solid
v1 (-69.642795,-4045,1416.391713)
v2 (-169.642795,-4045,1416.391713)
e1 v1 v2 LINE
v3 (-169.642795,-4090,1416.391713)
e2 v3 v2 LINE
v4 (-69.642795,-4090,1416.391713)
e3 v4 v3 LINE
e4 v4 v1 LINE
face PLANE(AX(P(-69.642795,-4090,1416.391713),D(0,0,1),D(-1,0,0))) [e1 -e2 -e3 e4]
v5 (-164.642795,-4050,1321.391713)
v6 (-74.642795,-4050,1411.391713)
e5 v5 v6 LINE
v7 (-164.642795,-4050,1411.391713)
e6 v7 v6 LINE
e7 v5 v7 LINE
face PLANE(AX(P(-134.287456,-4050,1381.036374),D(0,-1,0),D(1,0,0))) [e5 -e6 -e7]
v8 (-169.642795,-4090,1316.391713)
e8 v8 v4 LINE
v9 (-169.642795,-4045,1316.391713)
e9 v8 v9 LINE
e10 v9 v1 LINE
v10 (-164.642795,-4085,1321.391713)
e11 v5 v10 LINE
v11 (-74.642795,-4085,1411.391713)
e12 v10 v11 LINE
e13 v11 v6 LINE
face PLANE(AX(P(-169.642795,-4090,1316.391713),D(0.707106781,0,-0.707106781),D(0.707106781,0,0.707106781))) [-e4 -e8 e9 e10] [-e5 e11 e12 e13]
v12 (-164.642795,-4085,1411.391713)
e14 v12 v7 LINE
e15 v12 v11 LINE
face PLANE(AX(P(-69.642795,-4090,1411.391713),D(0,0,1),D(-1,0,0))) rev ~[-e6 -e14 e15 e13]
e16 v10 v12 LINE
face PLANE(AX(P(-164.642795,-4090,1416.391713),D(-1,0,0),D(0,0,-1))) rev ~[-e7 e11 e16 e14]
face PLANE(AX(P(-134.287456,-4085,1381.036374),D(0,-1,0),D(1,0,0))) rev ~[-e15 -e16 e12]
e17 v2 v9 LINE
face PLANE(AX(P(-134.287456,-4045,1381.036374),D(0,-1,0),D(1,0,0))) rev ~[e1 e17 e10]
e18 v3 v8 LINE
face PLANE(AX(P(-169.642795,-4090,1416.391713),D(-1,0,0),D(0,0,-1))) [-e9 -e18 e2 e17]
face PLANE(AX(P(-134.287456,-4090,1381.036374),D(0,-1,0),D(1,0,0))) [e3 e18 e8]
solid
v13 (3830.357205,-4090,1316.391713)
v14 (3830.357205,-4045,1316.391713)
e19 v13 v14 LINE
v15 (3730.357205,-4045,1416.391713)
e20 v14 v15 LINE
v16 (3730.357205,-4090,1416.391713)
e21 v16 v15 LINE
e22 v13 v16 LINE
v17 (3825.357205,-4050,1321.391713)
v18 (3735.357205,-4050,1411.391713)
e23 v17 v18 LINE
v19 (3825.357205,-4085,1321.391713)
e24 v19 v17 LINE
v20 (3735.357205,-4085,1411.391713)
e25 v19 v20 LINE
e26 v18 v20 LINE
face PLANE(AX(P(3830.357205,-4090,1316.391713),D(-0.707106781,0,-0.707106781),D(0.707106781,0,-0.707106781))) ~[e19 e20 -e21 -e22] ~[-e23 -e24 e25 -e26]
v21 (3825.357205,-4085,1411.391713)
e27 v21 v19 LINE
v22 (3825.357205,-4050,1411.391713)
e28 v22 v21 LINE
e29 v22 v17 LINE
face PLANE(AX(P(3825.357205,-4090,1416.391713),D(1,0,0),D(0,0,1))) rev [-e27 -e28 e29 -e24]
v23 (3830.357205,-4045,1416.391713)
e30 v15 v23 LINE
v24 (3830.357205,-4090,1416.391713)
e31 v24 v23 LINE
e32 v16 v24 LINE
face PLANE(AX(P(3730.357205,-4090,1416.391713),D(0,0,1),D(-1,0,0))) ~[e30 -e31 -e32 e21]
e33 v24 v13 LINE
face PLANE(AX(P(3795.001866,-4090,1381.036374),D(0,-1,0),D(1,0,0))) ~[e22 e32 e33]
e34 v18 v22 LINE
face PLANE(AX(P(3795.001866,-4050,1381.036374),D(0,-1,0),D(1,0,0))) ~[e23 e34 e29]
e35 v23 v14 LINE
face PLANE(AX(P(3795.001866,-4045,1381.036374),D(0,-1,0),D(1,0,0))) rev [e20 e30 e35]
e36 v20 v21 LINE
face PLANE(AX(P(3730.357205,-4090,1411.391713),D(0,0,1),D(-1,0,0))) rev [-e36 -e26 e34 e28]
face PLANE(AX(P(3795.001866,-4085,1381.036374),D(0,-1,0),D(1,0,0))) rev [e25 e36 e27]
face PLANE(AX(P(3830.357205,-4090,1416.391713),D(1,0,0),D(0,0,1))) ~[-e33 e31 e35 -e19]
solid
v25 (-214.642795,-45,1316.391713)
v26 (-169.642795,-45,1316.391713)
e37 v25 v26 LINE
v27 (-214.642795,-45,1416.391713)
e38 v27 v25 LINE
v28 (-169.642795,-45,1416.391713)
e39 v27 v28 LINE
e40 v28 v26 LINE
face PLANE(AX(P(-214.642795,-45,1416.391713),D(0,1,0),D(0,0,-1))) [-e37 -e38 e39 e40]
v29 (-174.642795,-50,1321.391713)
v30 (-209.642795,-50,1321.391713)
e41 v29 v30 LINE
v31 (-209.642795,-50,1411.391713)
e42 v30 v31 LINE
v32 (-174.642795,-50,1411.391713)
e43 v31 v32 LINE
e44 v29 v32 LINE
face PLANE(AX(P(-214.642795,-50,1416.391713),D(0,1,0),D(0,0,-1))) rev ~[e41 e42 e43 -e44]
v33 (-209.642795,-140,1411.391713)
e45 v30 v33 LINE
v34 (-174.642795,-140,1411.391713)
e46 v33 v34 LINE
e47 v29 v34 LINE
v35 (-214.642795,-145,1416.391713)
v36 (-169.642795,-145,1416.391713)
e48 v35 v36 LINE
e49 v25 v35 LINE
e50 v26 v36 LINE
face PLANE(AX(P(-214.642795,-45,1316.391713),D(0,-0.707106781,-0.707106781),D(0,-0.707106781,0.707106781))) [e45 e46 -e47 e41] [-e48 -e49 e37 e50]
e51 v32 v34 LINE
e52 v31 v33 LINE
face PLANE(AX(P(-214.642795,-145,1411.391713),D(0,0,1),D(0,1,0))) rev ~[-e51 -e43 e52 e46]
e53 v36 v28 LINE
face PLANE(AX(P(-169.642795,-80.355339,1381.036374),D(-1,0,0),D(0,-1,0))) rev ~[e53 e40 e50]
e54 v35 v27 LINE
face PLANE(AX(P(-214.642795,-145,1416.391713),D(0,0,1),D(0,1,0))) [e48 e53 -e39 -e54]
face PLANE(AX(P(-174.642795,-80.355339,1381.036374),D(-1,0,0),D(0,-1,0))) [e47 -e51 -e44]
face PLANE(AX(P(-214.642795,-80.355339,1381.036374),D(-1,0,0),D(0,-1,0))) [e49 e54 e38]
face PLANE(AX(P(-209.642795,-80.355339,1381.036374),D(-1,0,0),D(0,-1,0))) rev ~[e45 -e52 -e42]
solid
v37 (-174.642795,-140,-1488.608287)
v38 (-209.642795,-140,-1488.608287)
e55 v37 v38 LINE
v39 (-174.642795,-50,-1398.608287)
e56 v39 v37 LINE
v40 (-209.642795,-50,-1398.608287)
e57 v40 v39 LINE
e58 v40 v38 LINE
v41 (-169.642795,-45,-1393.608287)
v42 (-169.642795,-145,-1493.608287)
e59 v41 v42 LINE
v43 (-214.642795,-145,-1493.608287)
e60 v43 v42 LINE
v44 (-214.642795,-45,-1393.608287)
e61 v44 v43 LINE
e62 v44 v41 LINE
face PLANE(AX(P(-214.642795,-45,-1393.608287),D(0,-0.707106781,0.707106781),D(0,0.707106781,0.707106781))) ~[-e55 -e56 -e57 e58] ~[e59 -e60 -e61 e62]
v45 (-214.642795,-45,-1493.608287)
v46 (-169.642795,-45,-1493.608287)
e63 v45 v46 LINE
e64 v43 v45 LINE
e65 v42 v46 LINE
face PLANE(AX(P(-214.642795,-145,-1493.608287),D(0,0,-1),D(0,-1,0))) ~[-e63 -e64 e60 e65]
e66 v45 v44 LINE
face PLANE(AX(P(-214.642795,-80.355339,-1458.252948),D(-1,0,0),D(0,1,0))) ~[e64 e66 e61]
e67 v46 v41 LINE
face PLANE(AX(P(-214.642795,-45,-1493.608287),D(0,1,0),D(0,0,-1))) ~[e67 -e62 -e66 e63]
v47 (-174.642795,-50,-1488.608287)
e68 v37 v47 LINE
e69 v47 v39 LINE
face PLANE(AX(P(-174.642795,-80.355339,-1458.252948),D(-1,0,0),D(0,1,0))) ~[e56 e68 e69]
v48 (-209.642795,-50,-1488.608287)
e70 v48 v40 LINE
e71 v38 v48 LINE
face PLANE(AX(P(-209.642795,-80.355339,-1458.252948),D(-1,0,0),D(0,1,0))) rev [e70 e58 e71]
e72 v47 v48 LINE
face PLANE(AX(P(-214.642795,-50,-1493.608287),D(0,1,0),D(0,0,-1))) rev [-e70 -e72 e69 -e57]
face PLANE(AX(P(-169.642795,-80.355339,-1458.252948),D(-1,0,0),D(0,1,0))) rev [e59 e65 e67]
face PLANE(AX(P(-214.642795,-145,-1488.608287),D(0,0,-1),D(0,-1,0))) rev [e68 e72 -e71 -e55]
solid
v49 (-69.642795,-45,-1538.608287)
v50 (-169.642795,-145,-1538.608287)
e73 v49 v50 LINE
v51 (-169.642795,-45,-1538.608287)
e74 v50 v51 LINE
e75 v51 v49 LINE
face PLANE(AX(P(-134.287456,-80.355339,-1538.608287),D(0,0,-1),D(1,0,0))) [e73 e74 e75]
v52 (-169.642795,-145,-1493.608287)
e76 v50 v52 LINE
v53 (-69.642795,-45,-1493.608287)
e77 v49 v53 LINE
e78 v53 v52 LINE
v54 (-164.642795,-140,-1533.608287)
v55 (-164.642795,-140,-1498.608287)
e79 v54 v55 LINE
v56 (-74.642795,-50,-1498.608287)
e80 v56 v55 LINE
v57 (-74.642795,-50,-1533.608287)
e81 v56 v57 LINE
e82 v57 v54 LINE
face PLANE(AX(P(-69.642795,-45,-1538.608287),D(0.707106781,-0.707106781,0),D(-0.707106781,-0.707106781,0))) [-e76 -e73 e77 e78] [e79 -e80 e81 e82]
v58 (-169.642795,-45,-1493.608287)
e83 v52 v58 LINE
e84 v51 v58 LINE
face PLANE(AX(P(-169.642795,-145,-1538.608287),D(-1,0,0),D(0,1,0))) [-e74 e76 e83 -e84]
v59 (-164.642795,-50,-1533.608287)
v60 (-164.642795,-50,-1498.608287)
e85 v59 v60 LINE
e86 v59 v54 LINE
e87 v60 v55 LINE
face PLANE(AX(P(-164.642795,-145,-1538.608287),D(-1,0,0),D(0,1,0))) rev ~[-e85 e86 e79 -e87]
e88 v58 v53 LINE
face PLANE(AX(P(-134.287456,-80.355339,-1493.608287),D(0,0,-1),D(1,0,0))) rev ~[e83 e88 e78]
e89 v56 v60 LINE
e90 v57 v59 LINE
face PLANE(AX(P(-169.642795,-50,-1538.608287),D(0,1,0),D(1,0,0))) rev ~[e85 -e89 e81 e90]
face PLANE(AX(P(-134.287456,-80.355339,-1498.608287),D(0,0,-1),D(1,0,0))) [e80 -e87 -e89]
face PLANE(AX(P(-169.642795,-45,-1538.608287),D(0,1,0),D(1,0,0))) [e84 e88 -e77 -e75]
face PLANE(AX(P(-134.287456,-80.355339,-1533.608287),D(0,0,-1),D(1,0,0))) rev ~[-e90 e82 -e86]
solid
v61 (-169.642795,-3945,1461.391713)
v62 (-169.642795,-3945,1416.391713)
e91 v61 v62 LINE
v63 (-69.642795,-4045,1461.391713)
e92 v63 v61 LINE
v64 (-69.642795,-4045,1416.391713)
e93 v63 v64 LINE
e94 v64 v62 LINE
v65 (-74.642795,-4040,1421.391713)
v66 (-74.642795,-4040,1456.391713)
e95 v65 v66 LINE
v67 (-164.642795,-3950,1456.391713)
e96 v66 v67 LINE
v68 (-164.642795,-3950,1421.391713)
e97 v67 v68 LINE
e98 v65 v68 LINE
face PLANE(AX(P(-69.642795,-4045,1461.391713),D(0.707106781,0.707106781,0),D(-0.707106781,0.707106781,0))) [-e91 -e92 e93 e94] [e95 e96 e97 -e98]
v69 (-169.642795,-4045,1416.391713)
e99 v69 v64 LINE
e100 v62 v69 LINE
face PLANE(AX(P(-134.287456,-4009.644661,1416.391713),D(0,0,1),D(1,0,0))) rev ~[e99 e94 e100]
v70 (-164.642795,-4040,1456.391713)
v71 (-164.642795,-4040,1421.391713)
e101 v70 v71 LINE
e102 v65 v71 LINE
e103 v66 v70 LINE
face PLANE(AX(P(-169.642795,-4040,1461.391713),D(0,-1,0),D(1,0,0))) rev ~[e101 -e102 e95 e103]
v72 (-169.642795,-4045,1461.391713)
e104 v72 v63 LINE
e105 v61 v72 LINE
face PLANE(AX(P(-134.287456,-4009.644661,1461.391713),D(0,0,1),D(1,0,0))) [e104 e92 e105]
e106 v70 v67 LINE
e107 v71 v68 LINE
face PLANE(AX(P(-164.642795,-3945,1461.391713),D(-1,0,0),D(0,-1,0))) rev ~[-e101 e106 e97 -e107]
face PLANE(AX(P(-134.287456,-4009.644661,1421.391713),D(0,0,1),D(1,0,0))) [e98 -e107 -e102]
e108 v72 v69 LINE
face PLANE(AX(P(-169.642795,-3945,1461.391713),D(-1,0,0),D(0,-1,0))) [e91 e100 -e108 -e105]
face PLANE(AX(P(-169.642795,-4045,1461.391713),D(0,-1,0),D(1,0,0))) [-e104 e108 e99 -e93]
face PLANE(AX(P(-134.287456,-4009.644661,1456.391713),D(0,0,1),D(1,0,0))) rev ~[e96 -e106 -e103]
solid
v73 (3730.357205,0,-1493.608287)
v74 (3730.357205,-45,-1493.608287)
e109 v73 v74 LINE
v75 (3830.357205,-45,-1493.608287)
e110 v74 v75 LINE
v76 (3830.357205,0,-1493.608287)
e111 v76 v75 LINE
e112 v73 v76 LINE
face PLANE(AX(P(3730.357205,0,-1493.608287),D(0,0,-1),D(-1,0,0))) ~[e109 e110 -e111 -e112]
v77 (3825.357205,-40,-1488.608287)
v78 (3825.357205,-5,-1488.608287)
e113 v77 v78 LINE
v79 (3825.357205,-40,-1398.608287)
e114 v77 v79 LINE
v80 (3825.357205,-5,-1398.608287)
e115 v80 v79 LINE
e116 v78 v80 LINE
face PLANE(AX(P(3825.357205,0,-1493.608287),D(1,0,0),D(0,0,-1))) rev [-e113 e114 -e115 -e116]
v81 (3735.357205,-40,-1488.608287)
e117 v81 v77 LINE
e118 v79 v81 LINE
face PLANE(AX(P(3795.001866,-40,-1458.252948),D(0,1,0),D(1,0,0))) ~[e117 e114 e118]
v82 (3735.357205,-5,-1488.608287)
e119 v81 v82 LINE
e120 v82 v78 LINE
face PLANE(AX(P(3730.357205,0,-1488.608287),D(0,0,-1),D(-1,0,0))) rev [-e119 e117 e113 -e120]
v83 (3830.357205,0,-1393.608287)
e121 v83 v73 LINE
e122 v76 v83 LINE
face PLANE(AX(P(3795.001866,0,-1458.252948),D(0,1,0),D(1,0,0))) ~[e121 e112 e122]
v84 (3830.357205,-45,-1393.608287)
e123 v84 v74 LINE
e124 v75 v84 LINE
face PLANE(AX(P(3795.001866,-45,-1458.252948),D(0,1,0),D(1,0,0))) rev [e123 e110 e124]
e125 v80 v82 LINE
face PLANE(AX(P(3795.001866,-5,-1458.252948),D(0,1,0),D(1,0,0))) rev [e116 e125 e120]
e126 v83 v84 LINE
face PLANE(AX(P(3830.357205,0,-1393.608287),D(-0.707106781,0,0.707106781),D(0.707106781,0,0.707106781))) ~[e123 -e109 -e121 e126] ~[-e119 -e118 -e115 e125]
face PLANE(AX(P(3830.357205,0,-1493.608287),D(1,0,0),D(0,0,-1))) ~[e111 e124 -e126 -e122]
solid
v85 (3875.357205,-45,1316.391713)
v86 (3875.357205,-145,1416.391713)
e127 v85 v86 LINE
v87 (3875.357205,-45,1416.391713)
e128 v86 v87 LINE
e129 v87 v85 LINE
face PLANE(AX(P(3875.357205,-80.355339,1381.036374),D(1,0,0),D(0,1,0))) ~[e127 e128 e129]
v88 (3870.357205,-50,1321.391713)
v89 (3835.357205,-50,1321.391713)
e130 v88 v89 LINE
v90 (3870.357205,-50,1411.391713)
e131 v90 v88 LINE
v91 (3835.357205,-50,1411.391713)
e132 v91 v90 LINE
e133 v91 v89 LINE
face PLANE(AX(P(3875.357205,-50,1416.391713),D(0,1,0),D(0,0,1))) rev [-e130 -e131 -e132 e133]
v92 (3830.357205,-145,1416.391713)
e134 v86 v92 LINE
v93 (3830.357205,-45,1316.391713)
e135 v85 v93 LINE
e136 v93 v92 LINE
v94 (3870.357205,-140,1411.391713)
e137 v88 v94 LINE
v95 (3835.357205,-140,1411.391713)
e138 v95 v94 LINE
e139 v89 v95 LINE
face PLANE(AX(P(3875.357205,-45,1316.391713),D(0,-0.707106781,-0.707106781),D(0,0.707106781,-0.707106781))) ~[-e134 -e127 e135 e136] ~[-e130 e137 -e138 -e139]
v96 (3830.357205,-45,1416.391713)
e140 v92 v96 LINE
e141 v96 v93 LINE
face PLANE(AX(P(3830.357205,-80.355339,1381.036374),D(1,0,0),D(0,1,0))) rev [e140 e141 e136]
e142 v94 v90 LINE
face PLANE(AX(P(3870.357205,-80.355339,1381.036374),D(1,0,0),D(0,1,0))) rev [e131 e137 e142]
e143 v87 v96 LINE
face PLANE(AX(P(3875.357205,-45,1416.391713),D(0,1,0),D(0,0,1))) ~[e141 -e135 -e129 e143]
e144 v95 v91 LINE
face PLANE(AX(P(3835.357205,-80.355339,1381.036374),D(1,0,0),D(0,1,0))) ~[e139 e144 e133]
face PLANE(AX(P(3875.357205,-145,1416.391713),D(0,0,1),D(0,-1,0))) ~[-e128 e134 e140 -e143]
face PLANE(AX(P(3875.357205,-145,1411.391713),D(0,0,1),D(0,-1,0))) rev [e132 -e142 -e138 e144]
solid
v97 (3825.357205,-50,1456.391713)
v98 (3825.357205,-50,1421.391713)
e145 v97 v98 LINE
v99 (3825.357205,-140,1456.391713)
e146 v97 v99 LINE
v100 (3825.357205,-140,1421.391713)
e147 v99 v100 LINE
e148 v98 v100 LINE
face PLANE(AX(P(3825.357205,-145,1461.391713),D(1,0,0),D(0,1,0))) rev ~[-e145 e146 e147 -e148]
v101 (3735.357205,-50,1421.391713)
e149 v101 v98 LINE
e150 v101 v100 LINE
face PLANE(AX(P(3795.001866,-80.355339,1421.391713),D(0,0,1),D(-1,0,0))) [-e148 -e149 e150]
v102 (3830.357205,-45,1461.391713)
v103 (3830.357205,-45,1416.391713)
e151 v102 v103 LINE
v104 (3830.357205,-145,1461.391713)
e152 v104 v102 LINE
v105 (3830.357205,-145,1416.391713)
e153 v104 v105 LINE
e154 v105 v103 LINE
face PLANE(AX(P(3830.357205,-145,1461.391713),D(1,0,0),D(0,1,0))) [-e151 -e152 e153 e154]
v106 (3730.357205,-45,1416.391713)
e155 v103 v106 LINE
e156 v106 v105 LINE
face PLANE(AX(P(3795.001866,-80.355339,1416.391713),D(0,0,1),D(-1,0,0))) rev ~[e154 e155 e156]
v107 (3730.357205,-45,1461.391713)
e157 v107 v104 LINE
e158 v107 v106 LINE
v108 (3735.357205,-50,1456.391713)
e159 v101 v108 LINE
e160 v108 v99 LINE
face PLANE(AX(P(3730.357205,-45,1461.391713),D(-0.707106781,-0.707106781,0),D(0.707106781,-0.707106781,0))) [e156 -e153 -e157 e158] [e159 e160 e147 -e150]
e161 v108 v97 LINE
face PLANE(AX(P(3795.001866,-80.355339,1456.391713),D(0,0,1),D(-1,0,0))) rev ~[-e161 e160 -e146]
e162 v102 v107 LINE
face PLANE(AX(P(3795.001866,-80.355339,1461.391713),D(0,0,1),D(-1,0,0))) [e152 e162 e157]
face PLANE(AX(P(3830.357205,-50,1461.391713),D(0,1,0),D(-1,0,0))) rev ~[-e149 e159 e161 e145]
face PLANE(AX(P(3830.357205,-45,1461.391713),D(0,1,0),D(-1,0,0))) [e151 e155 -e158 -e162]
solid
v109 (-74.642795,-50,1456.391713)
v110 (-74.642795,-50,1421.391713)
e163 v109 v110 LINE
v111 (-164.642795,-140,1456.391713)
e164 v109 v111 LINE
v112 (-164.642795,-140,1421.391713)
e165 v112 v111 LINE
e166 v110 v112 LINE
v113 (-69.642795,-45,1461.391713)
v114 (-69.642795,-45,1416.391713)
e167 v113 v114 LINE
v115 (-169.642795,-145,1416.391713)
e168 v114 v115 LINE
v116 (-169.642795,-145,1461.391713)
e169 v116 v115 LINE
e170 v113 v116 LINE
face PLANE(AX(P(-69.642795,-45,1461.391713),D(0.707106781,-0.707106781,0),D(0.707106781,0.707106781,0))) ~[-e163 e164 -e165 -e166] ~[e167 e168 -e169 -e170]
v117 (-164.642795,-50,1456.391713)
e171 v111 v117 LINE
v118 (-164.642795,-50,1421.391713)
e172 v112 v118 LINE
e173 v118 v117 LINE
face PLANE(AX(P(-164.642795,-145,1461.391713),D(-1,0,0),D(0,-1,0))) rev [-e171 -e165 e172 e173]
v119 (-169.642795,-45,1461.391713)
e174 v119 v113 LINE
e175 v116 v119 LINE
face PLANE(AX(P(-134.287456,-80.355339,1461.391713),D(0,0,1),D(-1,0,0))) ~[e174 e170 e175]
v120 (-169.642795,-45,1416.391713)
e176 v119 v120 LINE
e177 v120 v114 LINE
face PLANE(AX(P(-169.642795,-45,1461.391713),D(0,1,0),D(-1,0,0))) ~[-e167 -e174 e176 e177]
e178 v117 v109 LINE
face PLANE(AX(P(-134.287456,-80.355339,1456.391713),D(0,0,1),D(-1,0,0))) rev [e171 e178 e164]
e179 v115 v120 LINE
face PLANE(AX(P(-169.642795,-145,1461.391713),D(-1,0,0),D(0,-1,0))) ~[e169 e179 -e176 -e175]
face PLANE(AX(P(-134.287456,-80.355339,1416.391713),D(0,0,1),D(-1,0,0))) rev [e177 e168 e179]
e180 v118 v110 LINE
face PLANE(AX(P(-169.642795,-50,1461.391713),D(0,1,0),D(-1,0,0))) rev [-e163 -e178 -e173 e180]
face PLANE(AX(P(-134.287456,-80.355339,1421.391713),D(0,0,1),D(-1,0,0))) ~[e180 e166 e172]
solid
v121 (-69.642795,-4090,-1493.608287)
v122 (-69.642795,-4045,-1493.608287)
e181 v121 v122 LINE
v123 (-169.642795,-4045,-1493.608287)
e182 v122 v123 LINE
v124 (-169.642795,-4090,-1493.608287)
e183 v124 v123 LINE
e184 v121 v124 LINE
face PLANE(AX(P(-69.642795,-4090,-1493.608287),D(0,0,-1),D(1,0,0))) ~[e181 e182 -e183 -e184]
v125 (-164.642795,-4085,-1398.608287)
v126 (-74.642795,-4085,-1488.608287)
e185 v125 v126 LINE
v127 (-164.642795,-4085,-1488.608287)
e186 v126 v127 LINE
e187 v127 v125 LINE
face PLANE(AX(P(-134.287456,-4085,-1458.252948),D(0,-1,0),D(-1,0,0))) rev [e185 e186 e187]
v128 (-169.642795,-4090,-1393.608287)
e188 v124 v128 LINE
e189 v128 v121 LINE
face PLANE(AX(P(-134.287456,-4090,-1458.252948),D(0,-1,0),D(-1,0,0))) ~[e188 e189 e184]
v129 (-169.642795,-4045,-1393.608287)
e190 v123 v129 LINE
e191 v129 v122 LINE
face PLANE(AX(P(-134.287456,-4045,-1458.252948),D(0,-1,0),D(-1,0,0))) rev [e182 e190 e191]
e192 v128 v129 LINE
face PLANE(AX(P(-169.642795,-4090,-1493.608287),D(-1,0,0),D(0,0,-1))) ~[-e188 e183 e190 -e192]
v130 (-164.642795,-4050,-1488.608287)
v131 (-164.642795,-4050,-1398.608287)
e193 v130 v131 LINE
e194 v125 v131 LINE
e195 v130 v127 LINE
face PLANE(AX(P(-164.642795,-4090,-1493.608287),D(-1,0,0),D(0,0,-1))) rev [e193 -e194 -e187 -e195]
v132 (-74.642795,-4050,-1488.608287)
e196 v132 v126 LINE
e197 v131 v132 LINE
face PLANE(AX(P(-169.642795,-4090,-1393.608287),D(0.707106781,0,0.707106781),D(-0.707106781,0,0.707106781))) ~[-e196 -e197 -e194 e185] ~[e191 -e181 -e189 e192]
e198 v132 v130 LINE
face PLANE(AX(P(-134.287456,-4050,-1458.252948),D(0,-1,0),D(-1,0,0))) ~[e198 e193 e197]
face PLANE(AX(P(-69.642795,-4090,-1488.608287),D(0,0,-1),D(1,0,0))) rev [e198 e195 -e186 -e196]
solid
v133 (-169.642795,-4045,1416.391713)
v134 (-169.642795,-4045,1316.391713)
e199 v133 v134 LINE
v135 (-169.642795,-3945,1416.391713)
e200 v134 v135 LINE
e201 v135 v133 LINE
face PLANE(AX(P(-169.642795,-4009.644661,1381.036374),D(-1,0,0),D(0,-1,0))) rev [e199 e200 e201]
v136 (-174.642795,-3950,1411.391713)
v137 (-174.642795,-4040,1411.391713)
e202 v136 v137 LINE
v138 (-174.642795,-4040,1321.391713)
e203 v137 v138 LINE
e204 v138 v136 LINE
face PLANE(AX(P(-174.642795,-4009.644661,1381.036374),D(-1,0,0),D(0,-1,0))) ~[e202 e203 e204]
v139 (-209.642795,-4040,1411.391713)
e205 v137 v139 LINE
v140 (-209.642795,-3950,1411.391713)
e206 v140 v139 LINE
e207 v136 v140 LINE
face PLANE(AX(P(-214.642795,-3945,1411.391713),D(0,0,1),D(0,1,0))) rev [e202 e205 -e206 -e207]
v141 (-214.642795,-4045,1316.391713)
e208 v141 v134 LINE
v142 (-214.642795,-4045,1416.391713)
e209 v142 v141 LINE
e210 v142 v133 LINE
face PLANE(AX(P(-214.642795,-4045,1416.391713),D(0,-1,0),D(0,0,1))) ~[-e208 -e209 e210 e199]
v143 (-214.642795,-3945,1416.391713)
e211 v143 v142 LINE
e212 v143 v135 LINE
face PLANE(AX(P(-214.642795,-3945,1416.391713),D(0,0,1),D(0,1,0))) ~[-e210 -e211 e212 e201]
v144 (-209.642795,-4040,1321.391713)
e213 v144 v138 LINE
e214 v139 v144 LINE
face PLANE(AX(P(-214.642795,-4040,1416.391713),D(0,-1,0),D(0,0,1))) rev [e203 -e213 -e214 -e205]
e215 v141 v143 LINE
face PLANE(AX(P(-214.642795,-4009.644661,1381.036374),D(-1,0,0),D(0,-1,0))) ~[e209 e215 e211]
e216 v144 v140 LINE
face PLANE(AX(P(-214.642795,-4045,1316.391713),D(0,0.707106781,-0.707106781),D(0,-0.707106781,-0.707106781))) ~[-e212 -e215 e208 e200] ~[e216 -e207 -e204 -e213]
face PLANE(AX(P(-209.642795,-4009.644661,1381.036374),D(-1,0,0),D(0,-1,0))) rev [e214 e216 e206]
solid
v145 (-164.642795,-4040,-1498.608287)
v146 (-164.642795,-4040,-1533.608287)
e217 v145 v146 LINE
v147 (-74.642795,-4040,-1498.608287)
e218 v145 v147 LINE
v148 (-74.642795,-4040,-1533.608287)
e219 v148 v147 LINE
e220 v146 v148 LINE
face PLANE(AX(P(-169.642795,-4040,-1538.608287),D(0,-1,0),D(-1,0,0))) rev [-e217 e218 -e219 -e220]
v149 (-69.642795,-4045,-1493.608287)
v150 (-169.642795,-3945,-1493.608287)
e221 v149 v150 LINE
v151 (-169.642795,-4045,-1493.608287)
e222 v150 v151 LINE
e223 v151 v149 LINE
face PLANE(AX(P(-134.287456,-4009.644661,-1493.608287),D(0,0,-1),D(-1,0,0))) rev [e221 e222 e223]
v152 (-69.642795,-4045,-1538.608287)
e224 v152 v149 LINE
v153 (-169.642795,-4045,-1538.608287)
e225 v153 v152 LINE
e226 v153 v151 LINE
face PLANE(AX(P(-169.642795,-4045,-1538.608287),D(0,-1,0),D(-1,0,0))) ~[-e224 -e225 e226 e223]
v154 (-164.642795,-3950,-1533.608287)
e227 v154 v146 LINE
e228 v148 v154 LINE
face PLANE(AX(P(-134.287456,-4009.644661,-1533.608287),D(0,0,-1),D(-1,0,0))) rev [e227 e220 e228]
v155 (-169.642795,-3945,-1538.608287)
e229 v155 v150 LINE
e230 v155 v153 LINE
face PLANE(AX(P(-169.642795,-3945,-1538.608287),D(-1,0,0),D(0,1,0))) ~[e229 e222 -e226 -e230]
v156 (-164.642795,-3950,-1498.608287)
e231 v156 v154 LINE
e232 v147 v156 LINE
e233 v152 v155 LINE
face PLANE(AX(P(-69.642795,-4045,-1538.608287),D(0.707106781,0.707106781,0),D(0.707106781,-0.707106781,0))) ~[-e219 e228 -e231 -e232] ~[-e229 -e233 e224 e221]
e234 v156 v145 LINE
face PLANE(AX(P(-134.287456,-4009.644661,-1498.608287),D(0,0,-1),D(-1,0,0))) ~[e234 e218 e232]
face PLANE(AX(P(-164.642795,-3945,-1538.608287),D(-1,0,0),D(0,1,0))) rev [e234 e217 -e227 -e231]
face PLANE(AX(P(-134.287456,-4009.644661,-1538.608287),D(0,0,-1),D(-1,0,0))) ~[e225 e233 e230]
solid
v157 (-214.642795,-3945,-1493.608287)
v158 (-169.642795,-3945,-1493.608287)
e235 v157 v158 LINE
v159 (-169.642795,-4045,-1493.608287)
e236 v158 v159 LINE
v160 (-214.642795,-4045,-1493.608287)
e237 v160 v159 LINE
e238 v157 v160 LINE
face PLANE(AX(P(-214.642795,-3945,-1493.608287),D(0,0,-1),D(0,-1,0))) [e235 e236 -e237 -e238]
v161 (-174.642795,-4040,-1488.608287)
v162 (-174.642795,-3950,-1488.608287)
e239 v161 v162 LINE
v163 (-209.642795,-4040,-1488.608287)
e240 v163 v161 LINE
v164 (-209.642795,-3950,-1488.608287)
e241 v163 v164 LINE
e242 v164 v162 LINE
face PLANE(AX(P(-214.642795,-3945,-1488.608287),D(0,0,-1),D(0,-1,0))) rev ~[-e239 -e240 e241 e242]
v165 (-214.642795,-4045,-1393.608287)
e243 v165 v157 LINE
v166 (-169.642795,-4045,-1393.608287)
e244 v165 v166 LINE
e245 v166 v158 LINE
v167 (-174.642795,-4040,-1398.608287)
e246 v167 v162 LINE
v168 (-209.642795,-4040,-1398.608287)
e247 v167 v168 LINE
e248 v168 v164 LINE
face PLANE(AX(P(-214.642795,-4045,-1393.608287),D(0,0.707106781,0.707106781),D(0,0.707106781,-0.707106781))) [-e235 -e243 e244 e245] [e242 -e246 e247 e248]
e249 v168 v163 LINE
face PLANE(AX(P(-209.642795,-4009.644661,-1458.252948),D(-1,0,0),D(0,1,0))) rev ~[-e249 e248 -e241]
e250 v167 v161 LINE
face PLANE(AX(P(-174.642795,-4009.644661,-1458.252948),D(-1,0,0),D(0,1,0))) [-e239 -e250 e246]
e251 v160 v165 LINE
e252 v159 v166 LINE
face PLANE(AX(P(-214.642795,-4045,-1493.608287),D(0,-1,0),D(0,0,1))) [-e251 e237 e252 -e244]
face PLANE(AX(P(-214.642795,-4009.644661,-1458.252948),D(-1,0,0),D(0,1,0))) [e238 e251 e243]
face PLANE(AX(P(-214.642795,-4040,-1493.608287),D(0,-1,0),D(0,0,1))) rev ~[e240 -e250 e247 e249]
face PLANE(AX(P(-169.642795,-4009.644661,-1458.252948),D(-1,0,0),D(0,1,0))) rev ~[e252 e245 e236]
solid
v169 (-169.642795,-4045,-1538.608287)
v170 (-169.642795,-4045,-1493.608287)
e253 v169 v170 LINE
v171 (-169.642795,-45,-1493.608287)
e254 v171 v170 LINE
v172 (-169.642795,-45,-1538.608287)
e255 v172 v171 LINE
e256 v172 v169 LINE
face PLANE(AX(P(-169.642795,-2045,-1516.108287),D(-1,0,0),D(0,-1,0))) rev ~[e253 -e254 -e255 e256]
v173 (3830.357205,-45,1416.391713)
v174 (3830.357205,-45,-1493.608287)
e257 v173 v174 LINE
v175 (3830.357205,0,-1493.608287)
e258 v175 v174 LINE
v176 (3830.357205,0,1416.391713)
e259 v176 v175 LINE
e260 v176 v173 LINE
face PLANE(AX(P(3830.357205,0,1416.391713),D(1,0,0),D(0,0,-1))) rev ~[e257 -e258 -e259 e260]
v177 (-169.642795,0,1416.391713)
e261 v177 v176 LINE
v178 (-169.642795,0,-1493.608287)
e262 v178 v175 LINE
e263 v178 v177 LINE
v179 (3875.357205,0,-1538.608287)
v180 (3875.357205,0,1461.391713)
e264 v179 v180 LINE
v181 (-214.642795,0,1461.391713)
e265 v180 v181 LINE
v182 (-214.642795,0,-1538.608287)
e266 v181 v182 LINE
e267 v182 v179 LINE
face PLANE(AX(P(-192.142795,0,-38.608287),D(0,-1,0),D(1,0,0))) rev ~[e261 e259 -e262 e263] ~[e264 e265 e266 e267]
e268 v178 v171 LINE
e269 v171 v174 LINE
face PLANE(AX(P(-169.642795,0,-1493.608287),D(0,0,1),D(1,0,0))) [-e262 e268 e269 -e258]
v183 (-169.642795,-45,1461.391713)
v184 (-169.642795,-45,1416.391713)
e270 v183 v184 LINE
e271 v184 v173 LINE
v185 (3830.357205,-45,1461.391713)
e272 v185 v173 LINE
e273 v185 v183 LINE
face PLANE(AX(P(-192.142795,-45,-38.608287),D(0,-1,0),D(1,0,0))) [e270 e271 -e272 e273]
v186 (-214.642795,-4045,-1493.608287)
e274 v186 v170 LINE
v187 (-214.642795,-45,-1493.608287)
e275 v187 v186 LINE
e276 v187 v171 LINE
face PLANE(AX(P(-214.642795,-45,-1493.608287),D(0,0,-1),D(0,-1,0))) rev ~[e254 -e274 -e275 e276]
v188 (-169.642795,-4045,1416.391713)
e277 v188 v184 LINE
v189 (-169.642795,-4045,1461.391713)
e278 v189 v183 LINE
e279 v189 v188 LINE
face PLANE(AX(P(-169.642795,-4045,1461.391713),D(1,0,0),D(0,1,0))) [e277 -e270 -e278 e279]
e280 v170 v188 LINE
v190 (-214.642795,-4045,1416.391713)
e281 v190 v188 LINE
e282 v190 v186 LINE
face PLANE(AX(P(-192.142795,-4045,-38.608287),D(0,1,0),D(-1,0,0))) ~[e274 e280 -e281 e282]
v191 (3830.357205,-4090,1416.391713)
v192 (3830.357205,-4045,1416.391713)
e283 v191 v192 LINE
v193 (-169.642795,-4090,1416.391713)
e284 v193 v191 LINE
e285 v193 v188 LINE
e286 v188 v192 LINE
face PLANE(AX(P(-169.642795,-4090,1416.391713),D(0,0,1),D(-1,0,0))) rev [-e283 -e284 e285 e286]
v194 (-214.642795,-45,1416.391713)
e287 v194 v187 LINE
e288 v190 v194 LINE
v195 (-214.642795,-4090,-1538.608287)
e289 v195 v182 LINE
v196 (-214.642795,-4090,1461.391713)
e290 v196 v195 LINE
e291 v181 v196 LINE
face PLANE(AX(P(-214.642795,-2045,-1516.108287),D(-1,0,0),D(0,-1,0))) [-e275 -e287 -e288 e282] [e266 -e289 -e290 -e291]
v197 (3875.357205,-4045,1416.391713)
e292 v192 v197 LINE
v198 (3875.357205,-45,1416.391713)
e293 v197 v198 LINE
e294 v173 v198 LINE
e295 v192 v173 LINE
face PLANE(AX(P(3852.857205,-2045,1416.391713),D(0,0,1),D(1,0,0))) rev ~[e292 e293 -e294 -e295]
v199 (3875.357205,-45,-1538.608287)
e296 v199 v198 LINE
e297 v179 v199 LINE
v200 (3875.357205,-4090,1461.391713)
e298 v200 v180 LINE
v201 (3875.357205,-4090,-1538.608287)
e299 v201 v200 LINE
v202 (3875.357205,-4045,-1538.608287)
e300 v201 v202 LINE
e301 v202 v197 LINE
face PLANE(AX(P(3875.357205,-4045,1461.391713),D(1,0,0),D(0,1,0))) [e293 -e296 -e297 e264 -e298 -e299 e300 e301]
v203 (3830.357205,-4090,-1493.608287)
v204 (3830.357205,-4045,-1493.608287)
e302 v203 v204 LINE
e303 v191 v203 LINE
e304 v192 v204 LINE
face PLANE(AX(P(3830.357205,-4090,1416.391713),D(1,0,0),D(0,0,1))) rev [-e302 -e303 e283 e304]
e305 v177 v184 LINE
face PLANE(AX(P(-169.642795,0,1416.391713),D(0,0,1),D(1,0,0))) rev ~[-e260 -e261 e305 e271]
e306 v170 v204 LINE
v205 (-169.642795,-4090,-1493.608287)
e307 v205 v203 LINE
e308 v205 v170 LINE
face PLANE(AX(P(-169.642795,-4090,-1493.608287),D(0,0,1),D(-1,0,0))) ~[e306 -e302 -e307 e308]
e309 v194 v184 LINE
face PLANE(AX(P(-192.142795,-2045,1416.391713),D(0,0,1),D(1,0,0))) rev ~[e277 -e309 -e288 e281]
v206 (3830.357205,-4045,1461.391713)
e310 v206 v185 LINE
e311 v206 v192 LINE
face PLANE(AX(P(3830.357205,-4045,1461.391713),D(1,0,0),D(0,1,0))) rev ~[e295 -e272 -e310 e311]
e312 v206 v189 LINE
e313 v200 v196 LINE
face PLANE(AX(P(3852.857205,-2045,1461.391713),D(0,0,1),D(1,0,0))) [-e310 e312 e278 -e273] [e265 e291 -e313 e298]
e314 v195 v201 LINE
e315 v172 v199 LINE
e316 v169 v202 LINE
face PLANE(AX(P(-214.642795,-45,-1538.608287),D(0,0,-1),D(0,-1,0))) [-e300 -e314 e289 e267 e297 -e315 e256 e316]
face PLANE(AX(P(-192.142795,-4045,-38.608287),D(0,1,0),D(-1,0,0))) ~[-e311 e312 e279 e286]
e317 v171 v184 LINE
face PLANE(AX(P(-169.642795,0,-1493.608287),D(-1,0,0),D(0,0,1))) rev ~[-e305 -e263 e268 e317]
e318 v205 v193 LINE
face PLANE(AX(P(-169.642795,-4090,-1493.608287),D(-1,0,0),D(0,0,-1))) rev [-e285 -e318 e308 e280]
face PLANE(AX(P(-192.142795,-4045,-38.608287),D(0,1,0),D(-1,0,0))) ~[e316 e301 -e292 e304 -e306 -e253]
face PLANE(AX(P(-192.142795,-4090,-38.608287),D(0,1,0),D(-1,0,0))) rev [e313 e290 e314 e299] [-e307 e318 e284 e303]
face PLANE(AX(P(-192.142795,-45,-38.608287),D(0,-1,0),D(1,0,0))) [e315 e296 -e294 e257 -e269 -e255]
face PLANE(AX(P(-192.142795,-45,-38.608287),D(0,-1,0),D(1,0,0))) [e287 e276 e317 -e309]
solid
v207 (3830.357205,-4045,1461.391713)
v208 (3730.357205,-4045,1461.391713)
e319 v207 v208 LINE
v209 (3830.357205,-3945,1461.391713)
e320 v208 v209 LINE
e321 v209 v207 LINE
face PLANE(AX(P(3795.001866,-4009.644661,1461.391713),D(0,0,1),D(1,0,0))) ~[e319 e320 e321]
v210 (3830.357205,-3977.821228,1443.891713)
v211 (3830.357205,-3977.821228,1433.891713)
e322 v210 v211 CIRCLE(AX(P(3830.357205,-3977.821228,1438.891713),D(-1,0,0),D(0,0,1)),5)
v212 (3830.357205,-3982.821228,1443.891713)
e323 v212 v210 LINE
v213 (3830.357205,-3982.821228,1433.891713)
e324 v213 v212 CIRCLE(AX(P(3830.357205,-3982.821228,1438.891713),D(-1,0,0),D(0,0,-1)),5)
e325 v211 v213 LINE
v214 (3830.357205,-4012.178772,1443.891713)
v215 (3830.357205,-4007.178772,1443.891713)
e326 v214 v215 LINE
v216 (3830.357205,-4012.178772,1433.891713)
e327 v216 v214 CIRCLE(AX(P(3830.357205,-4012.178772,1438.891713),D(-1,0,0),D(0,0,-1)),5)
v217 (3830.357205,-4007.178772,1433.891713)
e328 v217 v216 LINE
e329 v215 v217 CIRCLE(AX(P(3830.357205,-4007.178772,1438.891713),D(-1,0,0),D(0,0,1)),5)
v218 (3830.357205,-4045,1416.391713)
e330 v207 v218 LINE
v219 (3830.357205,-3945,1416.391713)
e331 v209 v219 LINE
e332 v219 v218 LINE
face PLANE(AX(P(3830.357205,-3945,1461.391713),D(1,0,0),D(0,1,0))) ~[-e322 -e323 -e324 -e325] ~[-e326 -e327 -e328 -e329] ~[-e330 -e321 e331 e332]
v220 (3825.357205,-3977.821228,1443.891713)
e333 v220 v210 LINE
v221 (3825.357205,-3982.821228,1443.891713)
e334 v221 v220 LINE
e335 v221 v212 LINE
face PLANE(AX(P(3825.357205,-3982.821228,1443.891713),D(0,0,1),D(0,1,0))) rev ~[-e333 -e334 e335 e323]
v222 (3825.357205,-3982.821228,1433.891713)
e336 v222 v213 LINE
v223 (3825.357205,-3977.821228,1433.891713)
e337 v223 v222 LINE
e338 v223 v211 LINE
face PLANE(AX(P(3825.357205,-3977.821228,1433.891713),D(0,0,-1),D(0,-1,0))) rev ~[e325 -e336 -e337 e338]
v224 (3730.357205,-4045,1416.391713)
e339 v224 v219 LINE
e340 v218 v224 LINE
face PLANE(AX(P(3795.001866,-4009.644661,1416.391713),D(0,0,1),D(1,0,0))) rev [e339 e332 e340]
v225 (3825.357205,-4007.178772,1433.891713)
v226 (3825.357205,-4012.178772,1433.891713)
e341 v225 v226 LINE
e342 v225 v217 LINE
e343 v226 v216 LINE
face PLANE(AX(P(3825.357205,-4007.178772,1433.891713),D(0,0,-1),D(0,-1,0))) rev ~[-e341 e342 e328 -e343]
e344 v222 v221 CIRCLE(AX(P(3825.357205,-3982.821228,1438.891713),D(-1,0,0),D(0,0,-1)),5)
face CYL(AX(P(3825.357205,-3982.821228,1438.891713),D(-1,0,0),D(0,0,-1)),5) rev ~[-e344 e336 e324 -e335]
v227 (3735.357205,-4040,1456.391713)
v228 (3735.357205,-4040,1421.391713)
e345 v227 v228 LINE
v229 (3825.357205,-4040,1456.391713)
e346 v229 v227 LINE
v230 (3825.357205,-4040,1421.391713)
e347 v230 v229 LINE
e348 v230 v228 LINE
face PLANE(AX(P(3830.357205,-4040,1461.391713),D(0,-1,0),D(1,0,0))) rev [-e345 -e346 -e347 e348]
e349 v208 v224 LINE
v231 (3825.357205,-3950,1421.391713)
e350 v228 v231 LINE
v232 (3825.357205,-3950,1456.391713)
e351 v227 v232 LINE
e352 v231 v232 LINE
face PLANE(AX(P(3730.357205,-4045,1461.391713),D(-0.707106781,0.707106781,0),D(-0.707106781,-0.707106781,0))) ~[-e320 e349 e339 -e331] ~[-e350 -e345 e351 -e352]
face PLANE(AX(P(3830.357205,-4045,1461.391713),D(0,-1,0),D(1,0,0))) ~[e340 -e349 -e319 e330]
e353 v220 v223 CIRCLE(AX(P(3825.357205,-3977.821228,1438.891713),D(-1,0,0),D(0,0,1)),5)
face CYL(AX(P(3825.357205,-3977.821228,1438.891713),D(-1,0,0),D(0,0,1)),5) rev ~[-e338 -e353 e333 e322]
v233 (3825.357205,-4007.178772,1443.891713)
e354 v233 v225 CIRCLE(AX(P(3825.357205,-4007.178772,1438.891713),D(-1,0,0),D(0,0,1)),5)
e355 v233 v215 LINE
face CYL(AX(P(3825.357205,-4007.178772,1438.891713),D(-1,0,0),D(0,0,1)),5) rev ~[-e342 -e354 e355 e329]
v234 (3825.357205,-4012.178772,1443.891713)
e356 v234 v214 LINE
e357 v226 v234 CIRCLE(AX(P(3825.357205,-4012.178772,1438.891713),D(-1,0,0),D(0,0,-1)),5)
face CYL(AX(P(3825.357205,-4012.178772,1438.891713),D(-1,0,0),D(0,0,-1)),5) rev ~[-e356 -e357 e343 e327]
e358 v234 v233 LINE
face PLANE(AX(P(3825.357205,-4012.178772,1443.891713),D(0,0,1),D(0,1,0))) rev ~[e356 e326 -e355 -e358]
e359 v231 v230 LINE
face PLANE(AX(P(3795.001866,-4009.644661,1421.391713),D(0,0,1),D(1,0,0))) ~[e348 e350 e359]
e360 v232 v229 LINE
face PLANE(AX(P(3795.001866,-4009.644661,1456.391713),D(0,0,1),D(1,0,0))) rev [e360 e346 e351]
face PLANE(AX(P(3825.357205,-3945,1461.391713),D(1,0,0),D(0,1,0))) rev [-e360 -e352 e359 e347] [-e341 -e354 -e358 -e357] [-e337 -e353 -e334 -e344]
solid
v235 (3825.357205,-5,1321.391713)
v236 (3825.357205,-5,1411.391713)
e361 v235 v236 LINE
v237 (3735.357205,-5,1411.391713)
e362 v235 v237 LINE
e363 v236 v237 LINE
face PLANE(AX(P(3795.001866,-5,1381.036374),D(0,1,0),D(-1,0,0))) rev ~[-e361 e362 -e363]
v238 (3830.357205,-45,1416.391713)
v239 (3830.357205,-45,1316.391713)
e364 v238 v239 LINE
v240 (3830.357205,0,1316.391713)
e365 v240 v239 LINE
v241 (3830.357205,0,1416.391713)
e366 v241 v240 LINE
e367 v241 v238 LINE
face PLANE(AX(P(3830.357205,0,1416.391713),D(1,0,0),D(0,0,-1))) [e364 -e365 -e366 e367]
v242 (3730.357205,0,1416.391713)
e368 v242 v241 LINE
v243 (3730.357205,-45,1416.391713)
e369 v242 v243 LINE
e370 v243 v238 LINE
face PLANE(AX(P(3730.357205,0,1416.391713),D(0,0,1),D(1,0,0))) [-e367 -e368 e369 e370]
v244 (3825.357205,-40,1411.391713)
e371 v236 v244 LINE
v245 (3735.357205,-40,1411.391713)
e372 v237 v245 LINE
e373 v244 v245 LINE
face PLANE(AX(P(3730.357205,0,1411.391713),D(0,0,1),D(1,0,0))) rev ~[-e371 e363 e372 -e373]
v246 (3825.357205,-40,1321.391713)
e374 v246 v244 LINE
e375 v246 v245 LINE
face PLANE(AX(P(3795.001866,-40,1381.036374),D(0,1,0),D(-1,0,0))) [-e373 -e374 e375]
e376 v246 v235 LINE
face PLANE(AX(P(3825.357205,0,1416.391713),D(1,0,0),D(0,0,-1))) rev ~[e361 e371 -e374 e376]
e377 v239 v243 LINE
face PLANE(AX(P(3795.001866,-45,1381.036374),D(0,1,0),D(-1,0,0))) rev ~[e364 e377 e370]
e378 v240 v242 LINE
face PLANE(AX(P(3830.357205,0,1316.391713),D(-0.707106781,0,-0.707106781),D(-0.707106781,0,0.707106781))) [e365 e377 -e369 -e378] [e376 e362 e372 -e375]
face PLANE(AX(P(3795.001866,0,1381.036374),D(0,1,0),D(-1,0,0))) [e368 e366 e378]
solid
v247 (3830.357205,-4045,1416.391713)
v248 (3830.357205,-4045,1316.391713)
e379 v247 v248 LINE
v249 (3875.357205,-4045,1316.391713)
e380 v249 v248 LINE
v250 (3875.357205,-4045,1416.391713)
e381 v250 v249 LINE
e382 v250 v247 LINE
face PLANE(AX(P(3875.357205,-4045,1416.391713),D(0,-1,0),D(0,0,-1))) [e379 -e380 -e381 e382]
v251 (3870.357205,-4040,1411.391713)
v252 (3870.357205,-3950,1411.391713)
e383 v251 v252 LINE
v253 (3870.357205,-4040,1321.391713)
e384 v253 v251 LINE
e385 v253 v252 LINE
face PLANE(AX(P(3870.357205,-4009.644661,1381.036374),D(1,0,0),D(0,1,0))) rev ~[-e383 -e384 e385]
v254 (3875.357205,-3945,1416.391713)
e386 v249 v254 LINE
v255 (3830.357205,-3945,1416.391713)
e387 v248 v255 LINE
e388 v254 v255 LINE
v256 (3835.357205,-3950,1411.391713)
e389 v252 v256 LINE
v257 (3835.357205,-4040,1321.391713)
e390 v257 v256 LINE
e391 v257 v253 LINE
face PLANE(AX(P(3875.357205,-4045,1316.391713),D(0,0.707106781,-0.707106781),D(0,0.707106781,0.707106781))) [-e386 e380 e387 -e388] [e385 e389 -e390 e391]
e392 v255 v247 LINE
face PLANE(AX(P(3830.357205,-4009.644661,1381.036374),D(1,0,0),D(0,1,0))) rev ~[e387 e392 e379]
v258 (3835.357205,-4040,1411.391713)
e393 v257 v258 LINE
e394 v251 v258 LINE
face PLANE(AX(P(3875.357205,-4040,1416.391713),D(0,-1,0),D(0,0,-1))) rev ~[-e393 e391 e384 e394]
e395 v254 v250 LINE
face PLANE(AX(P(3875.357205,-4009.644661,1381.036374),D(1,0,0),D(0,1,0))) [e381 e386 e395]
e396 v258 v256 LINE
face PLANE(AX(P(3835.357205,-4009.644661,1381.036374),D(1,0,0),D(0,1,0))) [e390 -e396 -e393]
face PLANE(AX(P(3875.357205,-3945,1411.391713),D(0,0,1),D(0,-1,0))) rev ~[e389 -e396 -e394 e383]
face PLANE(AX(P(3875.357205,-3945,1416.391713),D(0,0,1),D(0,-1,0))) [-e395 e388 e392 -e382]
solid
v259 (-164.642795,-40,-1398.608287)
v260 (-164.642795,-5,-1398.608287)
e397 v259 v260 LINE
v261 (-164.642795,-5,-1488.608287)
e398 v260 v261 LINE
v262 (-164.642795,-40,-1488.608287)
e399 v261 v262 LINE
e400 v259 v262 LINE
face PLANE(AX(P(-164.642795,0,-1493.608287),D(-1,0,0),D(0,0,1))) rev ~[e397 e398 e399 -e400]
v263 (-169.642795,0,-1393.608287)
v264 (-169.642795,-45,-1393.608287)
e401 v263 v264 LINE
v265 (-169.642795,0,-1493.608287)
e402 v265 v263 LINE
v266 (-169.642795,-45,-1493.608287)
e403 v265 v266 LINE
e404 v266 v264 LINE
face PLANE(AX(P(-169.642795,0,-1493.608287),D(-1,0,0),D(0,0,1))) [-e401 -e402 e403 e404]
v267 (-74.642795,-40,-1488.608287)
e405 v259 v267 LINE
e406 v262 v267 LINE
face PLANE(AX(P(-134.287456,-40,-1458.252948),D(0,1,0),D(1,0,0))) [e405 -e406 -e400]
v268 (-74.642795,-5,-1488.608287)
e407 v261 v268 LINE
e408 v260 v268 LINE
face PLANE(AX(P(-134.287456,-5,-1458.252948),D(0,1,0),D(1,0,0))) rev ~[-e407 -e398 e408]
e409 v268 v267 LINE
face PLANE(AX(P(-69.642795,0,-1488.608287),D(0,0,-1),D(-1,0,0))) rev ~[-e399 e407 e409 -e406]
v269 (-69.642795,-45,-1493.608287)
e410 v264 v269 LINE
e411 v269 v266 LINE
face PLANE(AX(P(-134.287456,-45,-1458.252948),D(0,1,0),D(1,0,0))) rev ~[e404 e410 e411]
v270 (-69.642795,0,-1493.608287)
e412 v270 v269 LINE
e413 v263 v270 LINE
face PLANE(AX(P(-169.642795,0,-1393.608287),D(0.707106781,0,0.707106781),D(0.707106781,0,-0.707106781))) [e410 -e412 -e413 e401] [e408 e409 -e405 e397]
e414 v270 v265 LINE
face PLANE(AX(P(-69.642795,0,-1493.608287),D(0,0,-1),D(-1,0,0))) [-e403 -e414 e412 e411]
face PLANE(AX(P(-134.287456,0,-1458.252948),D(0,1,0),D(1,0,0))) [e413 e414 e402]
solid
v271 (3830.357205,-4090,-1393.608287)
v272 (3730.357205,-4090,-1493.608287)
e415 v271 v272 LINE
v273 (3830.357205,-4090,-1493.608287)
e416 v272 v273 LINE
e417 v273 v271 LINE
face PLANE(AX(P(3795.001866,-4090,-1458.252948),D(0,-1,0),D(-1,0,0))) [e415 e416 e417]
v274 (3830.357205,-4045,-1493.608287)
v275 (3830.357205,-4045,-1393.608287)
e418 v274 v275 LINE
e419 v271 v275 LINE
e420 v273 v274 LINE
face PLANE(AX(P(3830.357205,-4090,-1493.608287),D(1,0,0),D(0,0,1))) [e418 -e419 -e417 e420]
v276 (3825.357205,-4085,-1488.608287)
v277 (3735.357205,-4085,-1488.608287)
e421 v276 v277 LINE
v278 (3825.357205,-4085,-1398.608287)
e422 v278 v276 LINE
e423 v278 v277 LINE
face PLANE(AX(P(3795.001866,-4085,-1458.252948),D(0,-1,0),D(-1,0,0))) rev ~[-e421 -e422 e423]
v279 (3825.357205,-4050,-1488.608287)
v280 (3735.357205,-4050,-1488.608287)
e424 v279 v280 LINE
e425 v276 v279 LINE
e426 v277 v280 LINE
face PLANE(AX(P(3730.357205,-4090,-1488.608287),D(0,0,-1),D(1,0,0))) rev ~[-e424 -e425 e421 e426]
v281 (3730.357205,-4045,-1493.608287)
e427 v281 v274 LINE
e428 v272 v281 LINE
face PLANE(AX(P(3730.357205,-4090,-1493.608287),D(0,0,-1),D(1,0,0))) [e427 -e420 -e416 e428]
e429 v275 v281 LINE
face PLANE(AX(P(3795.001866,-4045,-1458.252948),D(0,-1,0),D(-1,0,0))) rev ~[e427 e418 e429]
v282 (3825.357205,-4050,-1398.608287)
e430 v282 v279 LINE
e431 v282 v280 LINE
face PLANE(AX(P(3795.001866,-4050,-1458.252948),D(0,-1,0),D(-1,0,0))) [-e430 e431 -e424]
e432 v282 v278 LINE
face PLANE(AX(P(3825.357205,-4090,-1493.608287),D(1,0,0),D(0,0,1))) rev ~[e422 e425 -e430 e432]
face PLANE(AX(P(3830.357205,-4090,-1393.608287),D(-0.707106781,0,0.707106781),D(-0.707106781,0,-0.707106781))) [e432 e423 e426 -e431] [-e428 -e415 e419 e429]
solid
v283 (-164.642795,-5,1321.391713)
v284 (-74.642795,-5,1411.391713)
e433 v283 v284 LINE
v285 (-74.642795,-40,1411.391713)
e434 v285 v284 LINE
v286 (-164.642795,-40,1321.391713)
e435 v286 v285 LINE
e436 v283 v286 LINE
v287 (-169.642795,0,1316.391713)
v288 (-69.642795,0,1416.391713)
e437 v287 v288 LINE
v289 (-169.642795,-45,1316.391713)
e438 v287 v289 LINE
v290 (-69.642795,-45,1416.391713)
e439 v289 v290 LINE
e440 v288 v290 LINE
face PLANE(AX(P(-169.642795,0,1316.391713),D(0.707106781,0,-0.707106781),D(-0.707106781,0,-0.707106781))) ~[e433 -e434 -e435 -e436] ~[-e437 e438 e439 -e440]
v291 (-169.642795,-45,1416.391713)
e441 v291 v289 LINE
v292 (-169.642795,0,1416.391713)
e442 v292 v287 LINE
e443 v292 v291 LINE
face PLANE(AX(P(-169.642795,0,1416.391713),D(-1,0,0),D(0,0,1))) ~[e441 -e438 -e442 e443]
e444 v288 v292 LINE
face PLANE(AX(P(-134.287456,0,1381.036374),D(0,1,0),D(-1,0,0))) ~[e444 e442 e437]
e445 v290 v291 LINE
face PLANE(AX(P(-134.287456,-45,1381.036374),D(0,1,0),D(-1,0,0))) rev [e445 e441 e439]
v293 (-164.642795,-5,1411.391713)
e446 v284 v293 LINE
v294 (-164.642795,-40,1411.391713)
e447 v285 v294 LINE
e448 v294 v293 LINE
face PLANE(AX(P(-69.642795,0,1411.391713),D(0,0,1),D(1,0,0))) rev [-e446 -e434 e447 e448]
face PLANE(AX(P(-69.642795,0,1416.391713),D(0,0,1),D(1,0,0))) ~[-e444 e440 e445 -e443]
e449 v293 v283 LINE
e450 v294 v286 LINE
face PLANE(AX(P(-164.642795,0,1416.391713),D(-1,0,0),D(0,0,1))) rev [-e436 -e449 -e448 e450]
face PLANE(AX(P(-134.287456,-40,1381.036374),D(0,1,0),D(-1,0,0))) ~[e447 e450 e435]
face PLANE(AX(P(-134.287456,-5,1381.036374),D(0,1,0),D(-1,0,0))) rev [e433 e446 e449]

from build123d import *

# Parameters (mm, degrees)
F0_W      = 4000
F0_H      = 45
F1_DEPTH  = 45
F4_W      = 45
F4_H      = 4000
F5_DEPTH  = 45
F6_W      = 4000
F6_H      = 45
F7_DEPTH  = 45
F9_DEPTH  = 45
F14_DEPTH = 45
F18_DEPTH = 45
F23_T     = -5
F23_2_T   = -5
F23_3_T   = -5
F23_4_T   = -5
F23_5_T   = -5
F23_6_T   = -5
F23_7_T   = -5
F23_8_T   = -5
F23_9_T   = -5
F23_10_T  = -5
F23_11_T  = -5
F23_12_T  = -5
F23_13_T  = -5
F23_14_T  = -5
F23_15_T  = -5
F23_16_T  = -5
F23_17_T  = -5
F23_18_T  = -5
F23_19_T  = -5
F23_20_T  = -5
F25_DEPTH = 25


with BuildPart() as f1:
    # F0 (on Front) → F1 (new body)
    with BuildSketch(Plane.XZ):
        Polygon((-169.6427954237, 1461.3917125762), (-214.6427954237, 1461.3917125762), (-214.6427954237, -1538.6082874238), (-169.6427954237, -1538.6082874238), (-169.6427954237, -1493.6082874238), (-169.6427954237, 1416.3917125762), align=None)
        Polygon((3875.3572045763, 1461.3917125762), (3830.3572045763, 1461.3917125762), (3830.3572045763, 1416.3917125762), (3830.3572045763, -1493.6082874238), (3830.3572045763, -1538.6082874238), (3875.3572045763, -1538.6082874238), align=None)
        with Locations((1830.3572045763, 1438.8917125762)):
            Rectangle(F0_W, F0_H)
        with Locations((1830.3572045763, -1516.1082874238)):
            Rectangle(F0_W, F0_H)
    extrude(amount=F1_DEPTH)


with BuildPart() as f3_1:
    # F3: instance of F1
    add(f1.part.mirror(Plane(origin=(1830.3572045763, -2045, -38.6082874238), x_dir=(1, 0, 0), z_dir=(0, -1, 0))))


with BuildPart() as f1_1:
    add(f1.part)

    add(f3_1.part)  # F5 merges F3_1
    # F4 (on face) → F5 (join)
    with BuildSketch(Plane.XY.offset(1461.3917125762)):
        with Locations((3852.8572045763, -2045)):
            Rectangle(F4_W, F4_H)
        with Locations((-192.1427954237, -2045)):
            Rectangle(F4_W, F4_H)
    extrude(amount=-F5_DEPTH)

    # F6 (on face) → F7 (join)
    with BuildSketch(Plane(origin=(-214.6427954237, 0, 0), x_dir=(0, -1, 0), z_dir=(-1, 0, 0))):
        with Locations((2045, -1516.1082874238)):
            Rectangle(F6_W, F6_H)
    extrude(amount=-F7_DEPTH)


with BuildPart() as f9:
    # F8 (on face) → F9 (new body)
    with BuildSketch(Plane.YZ.offset(3875.3572045763)):
        Polygon((-4045, 1316.3917125762), (-3945, 1416.3917125762), (-4045, 1416.3917125762), align=None)
    extrude(amount=-F9_DEPTH)


with BuildPart() as f10_1:
    # F10: instance of F9
    add(f9.part.mirror(Plane(origin=(1830.3572045763, -2045, -38.6082874238), x_dir=(1, 0, 0), z_dir=(0, -1, 0))))


with BuildPart() as f12_1:
    # F12: instance of F9
    add(f9.part.mirror(Plane(origin=(1830.3572045763, -2045, 1438.8917125762), x_dir=(0, -1, 0), z_dir=(-1, 0, 0))))


with BuildPart() as f12_2:
    # F12: instance of F10_1
    add(f10_1.part.mirror(Plane(origin=(1830.3572045763, -2045, 1438.8917125762), x_dir=(0, -1, 0), z_dir=(-1, 0, 0))))


with BuildPart() as f14:
    # F13 (on face) → F14 (new body)
    with BuildSketch(Plane(origin=(0, 0, 0), x_dir=(-1, 0, 0), z_dir=(0, 1, 0))):
        Polygon((-3730.3572045763, 1416.3917125762), (-3830.3572045763, 1416.3917125762), (-3830.3572045763, 1316.3917125762), align=None)
    extrude(amount=-F14_DEPTH)


with BuildPart() as f15_1:
    # F15: instance of F14
    add(f14.part.mirror(Plane(origin=(1830.3572045763, -2045, 1438.8917125762), x_dir=(0, -1, 0), z_dir=(-1, 0, 0))))


with BuildPart() as f16_1:
    # F16: instance of F14
    add(f14.part.mirror(Plane(origin=(1830.3572045763, -2045, -38.6082874238), x_dir=(1, 0, 0), z_dir=(0, -1, 0))))


with BuildPart() as f16_2:
    # F16: instance of F15_1
    add(f15_1.part.mirror(Plane(origin=(1830.3572045763, -2045, -38.6082874238), x_dir=(1, 0, 0), z_dir=(0, -1, 0))))


with BuildPart() as f18:
    # F17 (on face) → F18 (new body)
    with BuildSketch(Plane.XY.offset(1461.3917125762)):
        Polygon((-169.6427954237, -3945), (-169.6427954237, -4045), (-69.6427954237, -4045), align=None)
    extrude(amount=-F18_DEPTH)


with BuildPart() as f19_1:
    # F19: instance of F18
    add(f18.part.mirror(Plane(origin=(1830.3572045763, -2045, 1438.8917125762), x_dir=(0, -1, 0), z_dir=(-1, 0, 0))))


with BuildPart() as f20_1:
    # F20: instance of F18
    add(f18.part.mirror(Plane(origin=(1830.3572045763, -2045, -38.6082874238), x_dir=(1, 0, 0), z_dir=(0, -1, 0))))


with BuildPart() as f20_2:
    # F20: instance of F19_1
    add(f19_1.part.mirror(Plane(origin=(1830.3572045763, -2045, -38.6082874238), x_dir=(1, 0, 0), z_dir=(0, -1, 0))))

    # F23#7
    f23_7_openings = [f20_2.faces().sort_by_distance(p)[0] for p in [
        (3780.357205, -95, 1438.891713),
    ]]
    offset(amount=F23_7_T, openings=f23_7_openings)


with BuildPart() as f22_1:
    # F22: instance of F14
    add(f14.part.mirror(Plane(origin=(1830.3572045763, -22.5, -38.6082874238), x_dir=(1, 0, 0), z_dir=(0, 0, -1))))

    # F23#16
    f23_16_openings = [f22_1.faces().sort_by_distance(p)[0] for p in [
        (3780.357205, -22.5, -1443.608287),
    ]]
    offset(amount=F23_16_T, openings=f23_16_openings)


with BuildPart() as f22_2:
    # F22: instance of F15_1
    add(f15_1.part.mirror(Plane(origin=(1830.3572045763, -22.5, -38.6082874238), x_dir=(1, 0, 0), z_dir=(0, 0, -1))))

    # F23#2
    f23_2_openings = [f22_2.faces().sort_by_distance(p)[0] for p in [
        (-119.642795, -22.5, -1443.608287),
    ]]
    offset(amount=F23_2_T, openings=f23_2_openings)


with BuildPart() as f22_3:
    # F22: instance of F16_1
    add(f16_1.part.mirror(Plane(origin=(1830.3572045763, -22.5, -38.6082874238), x_dir=(1, 0, 0), z_dir=(0, 0, -1))))

    # F23#17
    f23_17_openings = [f22_3.faces().sort_by_distance(p)[0] for p in [
        (3780.357205, -4067.5, -1443.608287),
    ]]
    offset(amount=F23_17_T, openings=f23_17_openings)


with BuildPart() as f22_4:
    # F22: instance of F16_2
    add(f16_2.part.mirror(Plane(origin=(1830.3572045763, -22.5, -38.6082874238), x_dir=(1, 0, 0), z_dir=(0, 0, -1))))

    # F23#18
    f23_18_openings = [f22_4.faces().sort_by_distance(p)[0] for p in [
        (-119.642795, -4067.5, -1443.608287),
    ]]
    offset(amount=F23_18_T, openings=f23_18_openings)


with BuildPart() as f22_5:
    # F22: instance of F12_2
    add(f12_2.part.mirror(Plane(origin=(1830.3572045763, -22.5, -38.6082874238), x_dir=(1, 0, 0), z_dir=(0, 0, -1))))

    # F23
    f23_openings = [f22_5.faces().sort_by_distance(p)[0] for p in [
        (-192.142795, -95, -1443.608287),
    ]]
    offset(amount=F23_T, openings=f23_openings)


with BuildPart() as f22_6:
    # F22: instance of F12_1
    add(f12_1.part.mirror(Plane(origin=(1830.3572045763, -22.5, -38.6082874238), x_dir=(1, 0, 0), z_dir=(0, 0, -1))))

    # F23#20
    f23_20_openings = [f22_6.faces().sort_by_distance(p)[0] for p in [
        (-192.142795, -3995, -1443.608287),
    ]]
    offset(amount=F23_20_T, openings=f23_20_openings)


with BuildPart() as f22_7:
    # F22: instance of F20_1
    add(f20_1.part.mirror(Plane(origin=(1830.3572045763, -22.5, -38.6082874238), x_dir=(1, 0, 0), z_dir=(0, 0, -1))))

    # F23#3
    f23_3_openings = [f22_7.faces().sort_by_distance(p)[0] for p in [
        (-119.642795, -95, -1516.108287),
    ]]
    offset(amount=F23_3_T, openings=f23_3_openings)


with BuildPart() as f22_8:
    # F22: instance of F18
    add(f18.part.mirror(Plane(origin=(1830.3572045763, -22.5, -38.6082874238), x_dir=(1, 0, 0), z_dir=(0, 0, -1))))

    # F23#19
    f23_19_openings = [f22_8.faces().sort_by_distance(p)[0] for p in [
        (-119.642795, -3995, -1516.108287),
    ]]
    offset(amount=F23_19_T, openings=f23_19_openings)


with BuildPart() as f20_1_1:
    add(f20_1.part)

    # F23#4
    f23_4_openings = [f20_1_1.faces().sort_by_distance(p)[0] for p in [
        (-119.642795, -95, 1438.891713),
    ]]
    offset(amount=F23_4_T, openings=f23_4_openings)


with BuildPart() as f12_2_1:
    add(f12_2.part)

    # F23#5
    f23_5_openings = [f12_2_1.faces().sort_by_distance(p)[0] for p in [
        (-192.142795, -95, 1366.391713),
    ]]
    offset(amount=F23_5_T, openings=f23_5_openings)


with BuildPart() as f15_1_1:
    add(f15_1.part)

    # F23#6
    f23_6_openings = [f15_1_1.faces().sort_by_distance(p)[0] for p in [
        (-119.642795, -22.5, 1366.391713),
    ]]
    offset(amount=F23_6_T, openings=f23_6_openings)


with BuildPart() as f10_1_1:
    add(f10_1.part)

    # F23#8
    f23_8_openings = [f10_1_1.faces().sort_by_distance(p)[0] for p in [
        (3852.857205, -95, 1366.391713),
    ]]
    offset(amount=F23_8_T, openings=f23_8_openings)


with BuildPart() as f14_1:
    add(f14.part)

    # F23#9
    f23_9_openings = [f14_1.faces().sort_by_distance(p)[0] for p in [
        (3780.357205, -22.5, 1366.391713),
    ]]
    offset(amount=F23_9_T, openings=f23_9_openings)


with BuildPart() as f19_1_1:
    add(f19_1.part)

    # F23#10
    f23_10_openings = [f19_1_1.faces().sort_by_distance(p)[0] for p in [
        (3780.357205, -3995, 1438.891713),
    ]]
    offset(amount=F23_10_T, openings=f23_10_openings)

    # F24 (on face) → F25 (cut)
    with BuildSketch(Plane(origin=(3825.3572045763, 0, 0), x_dir=(0, -1, 0), z_dir=(-1, 0, 0))):
        with BuildLine():
            Line((3982.8212277441, 1443.8917125762), (3977.8212277441, 1443.8917125762))
            ThreePointArc((3977.8212277441, 1443.8917125762), (3972.8212277441, 1438.8917125762), (3977.8212277441, 1433.8917125762))
            Line((3977.8212277441, 1433.8917125762), (3982.8212277441, 1433.8917125762))
            ThreePointArc((3982.8212277441, 1433.8917125762), (3987.8212277441, 1438.8917125762), (3982.8212277441, 1443.8917125762))
        make_face()
        with BuildLine():
            ThreePointArc((4007.1787722559, 1443.8917125762), (4002.1787722559, 1438.8917125762), (4007.1787722559, 1433.8917125762))
            Line((4007.1787722559, 1433.8917125762), (4012.1787722559, 1433.8917125762))
            ThreePointArc((4012.1787722559, 1433.8917125762), (4017.1787722559, 1438.8917125762), (4012.1787722559, 1443.8917125762))
            Line((4012.1787722559, 1443.8917125762), (4007.1787722559, 1443.8917125762))
        make_face()
    extrude(amount=-F25_DEPTH, mode=Mode.SUBTRACT)


with BuildPart() as f9_1:
    add(f9.part)

    # F23#11
    f23_11_openings = [f9_1.faces().sort_by_distance(p)[0] for p in [
        (3852.857205, -3995, 1366.391713),
    ]]
    offset(amount=F23_11_T, openings=f23_11_openings)


with BuildPart() as f16_1_1:
    add(f16_1.part)

    # F23#12
    f23_12_openings = [f16_1_1.faces().sort_by_distance(p)[0] for p in [
        (3780.357205, -4067.5, 1366.391713),
    ]]
    offset(amount=F23_12_T, openings=f23_12_openings)


with BuildPart() as f18_1:
    add(f18.part)

    # F23#13
    f23_13_openings = [f18_1.faces().sort_by_distance(p)[0] for p in [
        (-119.642795, -3995, 1438.891713),
    ]]
    offset(amount=F23_13_T, openings=f23_13_openings)


with BuildPart() as f16_2_1:
    add(f16_2.part)

    # F23#14
    f23_14_openings = [f16_2_1.faces().sort_by_distance(p)[0] for p in [
        (-119.642795, -4067.5, 1366.391713),
    ]]
    offset(amount=F23_14_T, openings=f23_14_openings)


with BuildPart() as f12_1_1:
    add(f12_1.part)

    # F23#15
    f23_15_openings = [f12_1_1.faces().sort_by_distance(p)[0] for p in [
        (-192.142795, -3995, 1366.391713),
    ]]
    offset(amount=F23_15_T, openings=f23_15_openings)


solid = Compound([f1_1.part, f20_2.part, f22_1.part, f22_2.part, f22_3.part, f22_4.part, f22_5.part, f22_6.part, f22_7.part, f22_8.part, f20_1_1.part, f12_2_1.part, f15_1_1.part, f10_1_1.part, f14_1.part, f19_1_1.part, f9_1.part, f16_1_1.part, f18_1.part, f16_2_1.part, f12_1_1.part])
